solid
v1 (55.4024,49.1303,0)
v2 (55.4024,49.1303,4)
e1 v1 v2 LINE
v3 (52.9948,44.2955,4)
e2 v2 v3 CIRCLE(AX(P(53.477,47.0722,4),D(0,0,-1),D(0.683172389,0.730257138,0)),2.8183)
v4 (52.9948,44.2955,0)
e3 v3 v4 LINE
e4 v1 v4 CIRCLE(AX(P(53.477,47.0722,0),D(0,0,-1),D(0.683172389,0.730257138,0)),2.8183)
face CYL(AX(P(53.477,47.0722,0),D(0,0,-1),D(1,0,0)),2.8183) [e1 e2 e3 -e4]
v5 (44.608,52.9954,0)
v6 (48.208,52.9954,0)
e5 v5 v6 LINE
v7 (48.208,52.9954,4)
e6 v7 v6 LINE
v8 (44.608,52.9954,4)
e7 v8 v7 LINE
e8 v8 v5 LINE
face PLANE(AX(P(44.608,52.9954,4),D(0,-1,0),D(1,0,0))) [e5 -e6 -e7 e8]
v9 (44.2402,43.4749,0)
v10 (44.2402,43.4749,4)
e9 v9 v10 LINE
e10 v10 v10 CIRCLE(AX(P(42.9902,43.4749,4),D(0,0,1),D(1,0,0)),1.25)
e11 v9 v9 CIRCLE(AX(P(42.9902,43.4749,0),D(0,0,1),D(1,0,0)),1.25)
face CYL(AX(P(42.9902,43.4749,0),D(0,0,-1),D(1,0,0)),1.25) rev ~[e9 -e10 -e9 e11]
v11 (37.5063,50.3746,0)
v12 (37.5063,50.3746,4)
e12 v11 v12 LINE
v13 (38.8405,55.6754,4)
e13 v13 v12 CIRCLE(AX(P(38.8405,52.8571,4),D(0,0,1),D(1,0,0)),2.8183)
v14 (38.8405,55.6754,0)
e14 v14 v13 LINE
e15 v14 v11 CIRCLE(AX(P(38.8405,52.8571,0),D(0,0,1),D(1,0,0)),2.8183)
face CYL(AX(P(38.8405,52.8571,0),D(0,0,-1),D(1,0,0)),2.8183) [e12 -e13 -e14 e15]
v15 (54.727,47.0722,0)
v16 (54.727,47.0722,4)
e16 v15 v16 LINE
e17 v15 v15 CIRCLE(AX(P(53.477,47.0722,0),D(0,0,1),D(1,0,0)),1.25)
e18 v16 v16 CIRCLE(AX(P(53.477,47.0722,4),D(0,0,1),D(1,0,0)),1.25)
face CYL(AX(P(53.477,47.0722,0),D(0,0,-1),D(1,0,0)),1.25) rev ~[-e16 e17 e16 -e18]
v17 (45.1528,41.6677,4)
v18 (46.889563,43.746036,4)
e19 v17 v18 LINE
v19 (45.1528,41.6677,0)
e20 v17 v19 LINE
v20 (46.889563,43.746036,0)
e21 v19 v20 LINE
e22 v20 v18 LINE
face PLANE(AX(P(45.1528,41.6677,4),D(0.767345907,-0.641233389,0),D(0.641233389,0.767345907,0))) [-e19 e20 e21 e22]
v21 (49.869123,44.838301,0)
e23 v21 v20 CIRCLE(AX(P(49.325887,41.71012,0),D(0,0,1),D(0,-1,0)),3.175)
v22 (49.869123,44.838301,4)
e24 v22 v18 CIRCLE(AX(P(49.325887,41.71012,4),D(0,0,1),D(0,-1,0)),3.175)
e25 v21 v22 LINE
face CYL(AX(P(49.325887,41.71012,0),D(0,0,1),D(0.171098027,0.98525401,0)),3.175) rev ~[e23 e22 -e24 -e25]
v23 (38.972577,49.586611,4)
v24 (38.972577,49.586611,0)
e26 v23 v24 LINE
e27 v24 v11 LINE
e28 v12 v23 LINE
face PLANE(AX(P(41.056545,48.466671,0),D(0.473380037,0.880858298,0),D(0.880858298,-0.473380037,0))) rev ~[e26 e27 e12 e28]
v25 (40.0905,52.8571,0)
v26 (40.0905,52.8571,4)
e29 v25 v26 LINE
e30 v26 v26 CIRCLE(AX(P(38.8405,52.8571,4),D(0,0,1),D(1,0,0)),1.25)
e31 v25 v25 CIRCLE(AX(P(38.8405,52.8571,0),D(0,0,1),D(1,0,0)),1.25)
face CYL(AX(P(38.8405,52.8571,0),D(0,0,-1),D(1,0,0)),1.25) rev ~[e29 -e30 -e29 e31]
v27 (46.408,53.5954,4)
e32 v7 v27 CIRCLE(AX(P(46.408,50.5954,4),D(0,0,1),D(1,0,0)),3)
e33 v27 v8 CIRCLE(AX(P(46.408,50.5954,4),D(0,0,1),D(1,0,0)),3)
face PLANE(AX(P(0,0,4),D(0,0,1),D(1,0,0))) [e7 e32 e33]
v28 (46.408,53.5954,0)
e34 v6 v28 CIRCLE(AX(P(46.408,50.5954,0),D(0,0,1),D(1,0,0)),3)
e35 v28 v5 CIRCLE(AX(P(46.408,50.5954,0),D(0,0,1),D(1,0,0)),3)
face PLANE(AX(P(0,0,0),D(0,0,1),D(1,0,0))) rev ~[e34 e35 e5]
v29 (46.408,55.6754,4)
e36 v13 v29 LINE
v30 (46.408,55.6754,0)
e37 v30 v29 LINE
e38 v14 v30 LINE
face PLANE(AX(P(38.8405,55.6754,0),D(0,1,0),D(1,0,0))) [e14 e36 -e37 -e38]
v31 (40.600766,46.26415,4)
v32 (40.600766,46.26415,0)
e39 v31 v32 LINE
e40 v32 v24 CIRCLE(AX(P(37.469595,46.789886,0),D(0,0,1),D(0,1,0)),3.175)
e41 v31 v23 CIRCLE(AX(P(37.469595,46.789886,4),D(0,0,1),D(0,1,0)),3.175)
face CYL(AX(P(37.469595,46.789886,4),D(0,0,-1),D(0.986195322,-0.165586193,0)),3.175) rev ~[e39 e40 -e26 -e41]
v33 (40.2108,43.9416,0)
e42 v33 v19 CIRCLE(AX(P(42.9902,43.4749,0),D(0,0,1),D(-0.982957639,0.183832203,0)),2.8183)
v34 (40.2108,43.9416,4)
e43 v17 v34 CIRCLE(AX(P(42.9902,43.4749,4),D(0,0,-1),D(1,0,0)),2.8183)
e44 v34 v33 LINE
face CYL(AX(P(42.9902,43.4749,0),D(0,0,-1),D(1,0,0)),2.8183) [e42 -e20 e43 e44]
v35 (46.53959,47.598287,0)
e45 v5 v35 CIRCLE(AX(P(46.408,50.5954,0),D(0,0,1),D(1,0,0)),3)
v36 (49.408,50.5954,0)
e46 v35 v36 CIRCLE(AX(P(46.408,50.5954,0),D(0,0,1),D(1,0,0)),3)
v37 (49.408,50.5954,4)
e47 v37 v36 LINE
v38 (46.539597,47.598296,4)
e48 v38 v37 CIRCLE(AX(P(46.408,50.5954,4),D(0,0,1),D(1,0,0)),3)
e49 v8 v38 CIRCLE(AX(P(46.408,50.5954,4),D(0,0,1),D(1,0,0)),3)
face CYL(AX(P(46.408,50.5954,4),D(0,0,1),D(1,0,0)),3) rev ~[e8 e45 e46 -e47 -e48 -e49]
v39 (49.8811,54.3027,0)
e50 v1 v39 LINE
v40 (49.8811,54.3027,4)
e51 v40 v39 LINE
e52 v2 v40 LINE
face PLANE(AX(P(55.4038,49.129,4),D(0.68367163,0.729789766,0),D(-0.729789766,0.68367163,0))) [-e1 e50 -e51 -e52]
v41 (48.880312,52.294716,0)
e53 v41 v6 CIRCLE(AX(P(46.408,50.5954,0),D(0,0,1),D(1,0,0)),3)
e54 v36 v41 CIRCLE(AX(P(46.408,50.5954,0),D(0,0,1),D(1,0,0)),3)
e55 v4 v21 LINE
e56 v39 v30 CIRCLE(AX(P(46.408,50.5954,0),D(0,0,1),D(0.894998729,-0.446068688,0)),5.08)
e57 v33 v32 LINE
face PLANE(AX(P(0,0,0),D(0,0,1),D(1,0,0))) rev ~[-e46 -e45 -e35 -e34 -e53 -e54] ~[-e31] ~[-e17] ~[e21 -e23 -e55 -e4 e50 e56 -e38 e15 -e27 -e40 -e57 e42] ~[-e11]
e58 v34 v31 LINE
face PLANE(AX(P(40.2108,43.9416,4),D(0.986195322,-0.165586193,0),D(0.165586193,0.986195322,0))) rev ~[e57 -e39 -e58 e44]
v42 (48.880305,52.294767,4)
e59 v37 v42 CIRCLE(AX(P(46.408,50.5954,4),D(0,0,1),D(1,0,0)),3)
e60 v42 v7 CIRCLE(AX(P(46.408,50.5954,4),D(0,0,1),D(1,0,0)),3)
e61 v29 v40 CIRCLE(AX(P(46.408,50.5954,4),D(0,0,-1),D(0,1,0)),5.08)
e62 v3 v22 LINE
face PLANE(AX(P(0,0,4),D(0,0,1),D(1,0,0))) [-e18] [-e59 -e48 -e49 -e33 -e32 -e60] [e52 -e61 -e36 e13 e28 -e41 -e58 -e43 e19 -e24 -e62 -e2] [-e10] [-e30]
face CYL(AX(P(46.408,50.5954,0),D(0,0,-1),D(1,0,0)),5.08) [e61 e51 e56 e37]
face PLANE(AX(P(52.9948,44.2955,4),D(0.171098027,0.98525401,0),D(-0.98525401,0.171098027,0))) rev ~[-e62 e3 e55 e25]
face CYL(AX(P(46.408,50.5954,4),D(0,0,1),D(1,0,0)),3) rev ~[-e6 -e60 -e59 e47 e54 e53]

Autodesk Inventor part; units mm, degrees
ref_plane "YZ Plane" through (0, 0, 0) normal (1, 0, 0) x (0, 1, 0)
ref_plane "XZ Plane" through (0, 0, 0) normal (0, 1, 0) x (-1, 0, 0)
ref_plane "XY Plane" through (0, 0, 0) normal (0, 0, 1) x (1, 0, 0)
sketch "Sketch2" plane through (0, 0, 0) normal (0, 0, 1) x (1, 0, 0)
  circle A0 centre (46.408, 50.5954) radius 3.175 construction
  circle A1 centre (46.408, 50.5954) radius 5.08
  line L0 (46.408, 50.5954) -> (38.8405, 52.8571) construction
  line L1 (46.408, 50.5954) -> (53.477, 47.0722) construction
  circle A2 centre (38.8405, 52.8571) radius 2.8183
  circle A3 centre (53.477, 47.0722) radius 2.8183
  circle A4 centre (38.8405, 52.8571) radius 1.25
  circle A5 centre (53.477, 47.0722) radius 1.25
  line L2 (38.8405, 55.6754) -> (46.408, 55.6754)
  line L3 (37.5063, 50.3746) -> (42.0976, 47.9072)
  line L4 (55.4024, 49.1303) -> (50.0414, 54.1458)
  line L5 (52.3888, 44.4725) -> (48.6507, 46.0372)
  circle A6 centre (46.408, 50.5954) radius 3
  circle A7 centre (46.408, 50.5954) radius 4.2333 construction
  line L6 (46.408, 50.5954) -> (42.9902, 43.4749) construction
  circle A8 centre (42.9902, 43.4749) radius 1.25
  circle A9 centre (42.9902, 43.4749) radius 2.8183
  line L7 (40.2199, 43.993) -> (41.3557, 50.0663)
  line L8 (45.2023, 41.7287) -> (48.5744, 46.0005)
  point P0 (0, 0)
  dimension "d7" = 10.16
  dimension "d8" = 2.5
  dimension "d9" = 6
  dimension "d10" = 8.4667
extrude "Plate2" add sketch "Sketch2" along normal blind 4 contours A1 | A3 | A1 A2 L2 | A1 L7 L3 A2 | A2 | A1 L3 L7 | A9
sketch "Sketch3" plane through (0, 0, 4) normal (0, 0, 1) x (1, 0, 0)
  arc A0 (42.0976, 47.9072) -> (44.2097, 46.0157) centre (46.408, 50.5954) ccw
  circle A1 centre (46.408, 50.5954) radius 5.08
  circle A2 centre (42.9902, 43.4749) radius 2.8183
  line L0 (40.2108, 43.9416) -> (41.328, 50.5954)
  line L1 (45.1528, 41.6677) -> (48.9266, 46.1837)
  arc A3 (44.2097, 46.0157) -> (50.9546, 48.3294) centre (46.408, 50.5954) ccw
  point P0 (0, 0)
sheet face with bend "Face3" sketch "Sketch3" thickness 4 toward (0, 0, -1) bend radius 4 contours A0 A2 L0 A1 | A1 L1 A2
bend "Bend1"
sketch "Sketch4" plane through (0, 0, 4) normal (0, 0, 1) x (1, 0, 0)
  arc A0 (50.9546, 48.3294) -> (46.408, 55.6754) centre (46.408, 50.5954) ccw
  arc A1 (50.9546, 48.3294) -> (46.408, 55.6754) centre (46.408, 50.5954) ccw
  circle A2 centre (46.408, 50.5954) radius 5.08
  circle A3 centre (53.477, 47.0722) radius 2.8183
  line L0 (55.4038, 49.129) -> (49.8811, 54.3027)
  line L1 (52.9948, 44.2955) -> (45.5388, 45.5903)
  arc A4 (44.2097, 46.0157) -> (50.9546, 48.3294) centre (46.408, 50.5954) ccw
  line L2 (49.8811, 54.3027) -> (45.5388, 45.5903)
  point P0 (0, 0)
sheet face with bend "Face4" sketch "Sketch4" thickness 4 toward (0, 0, -1) bend radius 4 picked at (48.6605, 51.1377) contours A2 L2 A0 | A3 L1 A2 | A0 L0 A3
bend "Bend2"
sketch "Sketch5" plane through (0, 0, 4) normal (0, 0, 1) x (1, 0, 0)
  arc A0 (48.8803, 52.2948) -> (46.5396, 47.5983) centre (46.408, 50.5954) ccw projected
  arc A1 (48.8803, 52.2948) -> (46.5396, 47.5983) centre (46.408, 50.5954) ccw projected
  circle A2 centre (46.408, 50.5954) radius 3
  point P0 (0, 0)
  point P1 (46.5396, 47.5983)
extrude "Extrusion1" cut sketch "Sketch5" against normal blind 25.4
fillet "Fillet1" radius 3.175 2 edges at (40.9777, 48.509, 2) (48.0642, 45.1518, 2)
sketch "Sketch6" plane through (0, 0, 4) normal (0, 0, 1) x (1, 0, 0)
  circle A0 centre (46.408, 50.5954) radius 3 projected
  line L0 (43.408, 53.5954) -> (49.408, 53.5954)
  line L1 (49.408, 53.5954) -> (49.408, 47.5954)
  line L2 (49.408, 47.5954) -> (43.408, 47.5954)
  line L3 (43.408, 47.5954) -> (43.408, 53.5954)
  line L4 (43.408, 52.9954) -> (49.408, 52.9954)
  point P0 (0, 0)
  point P1 (44.608, 52.9954)
  point P2 (48.208, 52.9954)
  dimension "d26" = 5.4
extrude "Extrusion2" add sketch "Sketch6" against normal up to surface (4 mm away) contours L4 A0 picked at (46.6209, 53.1725)
equation "\"d12\" = Thickness"
equation "\"d13\" = BendRadius"
equation "\"d14\" = BendReliefWidth"
equation "\"d16\" = MinimumRemnant"
equation "\"d15\" = BendReliefDepth"
equation "\"d17\" = TransitionRadius"
equation "\"d18\" = BendRadius"
equation "\"d19\" = BendReliefWidth"
equation "\"d21\" = MinimumRemnant"
equation "\"d20\" = BendReliefDepth"
equation "\"d22\" = TransitionRadius"
equation "\"BendRadius\" = Thickness"
equation "\"BendReliefWidth\" = Thickness"
equation "\"BendReliefDepth\" = 0.5 * Thickness"
equation "\"CornerReliefSize\" = 4 * Thickness"
equation "\"MinimumRemnant\" = 2 * Thickness"
equation "\"TransitionRadius\" = BendRadius"
equation "\"JacobiRadiusSize\" = BendRadius"
equation "\"GapSize\" = Thickness"
equation "\"Thickness\" = 4"
properties part number "ShaftLock"
